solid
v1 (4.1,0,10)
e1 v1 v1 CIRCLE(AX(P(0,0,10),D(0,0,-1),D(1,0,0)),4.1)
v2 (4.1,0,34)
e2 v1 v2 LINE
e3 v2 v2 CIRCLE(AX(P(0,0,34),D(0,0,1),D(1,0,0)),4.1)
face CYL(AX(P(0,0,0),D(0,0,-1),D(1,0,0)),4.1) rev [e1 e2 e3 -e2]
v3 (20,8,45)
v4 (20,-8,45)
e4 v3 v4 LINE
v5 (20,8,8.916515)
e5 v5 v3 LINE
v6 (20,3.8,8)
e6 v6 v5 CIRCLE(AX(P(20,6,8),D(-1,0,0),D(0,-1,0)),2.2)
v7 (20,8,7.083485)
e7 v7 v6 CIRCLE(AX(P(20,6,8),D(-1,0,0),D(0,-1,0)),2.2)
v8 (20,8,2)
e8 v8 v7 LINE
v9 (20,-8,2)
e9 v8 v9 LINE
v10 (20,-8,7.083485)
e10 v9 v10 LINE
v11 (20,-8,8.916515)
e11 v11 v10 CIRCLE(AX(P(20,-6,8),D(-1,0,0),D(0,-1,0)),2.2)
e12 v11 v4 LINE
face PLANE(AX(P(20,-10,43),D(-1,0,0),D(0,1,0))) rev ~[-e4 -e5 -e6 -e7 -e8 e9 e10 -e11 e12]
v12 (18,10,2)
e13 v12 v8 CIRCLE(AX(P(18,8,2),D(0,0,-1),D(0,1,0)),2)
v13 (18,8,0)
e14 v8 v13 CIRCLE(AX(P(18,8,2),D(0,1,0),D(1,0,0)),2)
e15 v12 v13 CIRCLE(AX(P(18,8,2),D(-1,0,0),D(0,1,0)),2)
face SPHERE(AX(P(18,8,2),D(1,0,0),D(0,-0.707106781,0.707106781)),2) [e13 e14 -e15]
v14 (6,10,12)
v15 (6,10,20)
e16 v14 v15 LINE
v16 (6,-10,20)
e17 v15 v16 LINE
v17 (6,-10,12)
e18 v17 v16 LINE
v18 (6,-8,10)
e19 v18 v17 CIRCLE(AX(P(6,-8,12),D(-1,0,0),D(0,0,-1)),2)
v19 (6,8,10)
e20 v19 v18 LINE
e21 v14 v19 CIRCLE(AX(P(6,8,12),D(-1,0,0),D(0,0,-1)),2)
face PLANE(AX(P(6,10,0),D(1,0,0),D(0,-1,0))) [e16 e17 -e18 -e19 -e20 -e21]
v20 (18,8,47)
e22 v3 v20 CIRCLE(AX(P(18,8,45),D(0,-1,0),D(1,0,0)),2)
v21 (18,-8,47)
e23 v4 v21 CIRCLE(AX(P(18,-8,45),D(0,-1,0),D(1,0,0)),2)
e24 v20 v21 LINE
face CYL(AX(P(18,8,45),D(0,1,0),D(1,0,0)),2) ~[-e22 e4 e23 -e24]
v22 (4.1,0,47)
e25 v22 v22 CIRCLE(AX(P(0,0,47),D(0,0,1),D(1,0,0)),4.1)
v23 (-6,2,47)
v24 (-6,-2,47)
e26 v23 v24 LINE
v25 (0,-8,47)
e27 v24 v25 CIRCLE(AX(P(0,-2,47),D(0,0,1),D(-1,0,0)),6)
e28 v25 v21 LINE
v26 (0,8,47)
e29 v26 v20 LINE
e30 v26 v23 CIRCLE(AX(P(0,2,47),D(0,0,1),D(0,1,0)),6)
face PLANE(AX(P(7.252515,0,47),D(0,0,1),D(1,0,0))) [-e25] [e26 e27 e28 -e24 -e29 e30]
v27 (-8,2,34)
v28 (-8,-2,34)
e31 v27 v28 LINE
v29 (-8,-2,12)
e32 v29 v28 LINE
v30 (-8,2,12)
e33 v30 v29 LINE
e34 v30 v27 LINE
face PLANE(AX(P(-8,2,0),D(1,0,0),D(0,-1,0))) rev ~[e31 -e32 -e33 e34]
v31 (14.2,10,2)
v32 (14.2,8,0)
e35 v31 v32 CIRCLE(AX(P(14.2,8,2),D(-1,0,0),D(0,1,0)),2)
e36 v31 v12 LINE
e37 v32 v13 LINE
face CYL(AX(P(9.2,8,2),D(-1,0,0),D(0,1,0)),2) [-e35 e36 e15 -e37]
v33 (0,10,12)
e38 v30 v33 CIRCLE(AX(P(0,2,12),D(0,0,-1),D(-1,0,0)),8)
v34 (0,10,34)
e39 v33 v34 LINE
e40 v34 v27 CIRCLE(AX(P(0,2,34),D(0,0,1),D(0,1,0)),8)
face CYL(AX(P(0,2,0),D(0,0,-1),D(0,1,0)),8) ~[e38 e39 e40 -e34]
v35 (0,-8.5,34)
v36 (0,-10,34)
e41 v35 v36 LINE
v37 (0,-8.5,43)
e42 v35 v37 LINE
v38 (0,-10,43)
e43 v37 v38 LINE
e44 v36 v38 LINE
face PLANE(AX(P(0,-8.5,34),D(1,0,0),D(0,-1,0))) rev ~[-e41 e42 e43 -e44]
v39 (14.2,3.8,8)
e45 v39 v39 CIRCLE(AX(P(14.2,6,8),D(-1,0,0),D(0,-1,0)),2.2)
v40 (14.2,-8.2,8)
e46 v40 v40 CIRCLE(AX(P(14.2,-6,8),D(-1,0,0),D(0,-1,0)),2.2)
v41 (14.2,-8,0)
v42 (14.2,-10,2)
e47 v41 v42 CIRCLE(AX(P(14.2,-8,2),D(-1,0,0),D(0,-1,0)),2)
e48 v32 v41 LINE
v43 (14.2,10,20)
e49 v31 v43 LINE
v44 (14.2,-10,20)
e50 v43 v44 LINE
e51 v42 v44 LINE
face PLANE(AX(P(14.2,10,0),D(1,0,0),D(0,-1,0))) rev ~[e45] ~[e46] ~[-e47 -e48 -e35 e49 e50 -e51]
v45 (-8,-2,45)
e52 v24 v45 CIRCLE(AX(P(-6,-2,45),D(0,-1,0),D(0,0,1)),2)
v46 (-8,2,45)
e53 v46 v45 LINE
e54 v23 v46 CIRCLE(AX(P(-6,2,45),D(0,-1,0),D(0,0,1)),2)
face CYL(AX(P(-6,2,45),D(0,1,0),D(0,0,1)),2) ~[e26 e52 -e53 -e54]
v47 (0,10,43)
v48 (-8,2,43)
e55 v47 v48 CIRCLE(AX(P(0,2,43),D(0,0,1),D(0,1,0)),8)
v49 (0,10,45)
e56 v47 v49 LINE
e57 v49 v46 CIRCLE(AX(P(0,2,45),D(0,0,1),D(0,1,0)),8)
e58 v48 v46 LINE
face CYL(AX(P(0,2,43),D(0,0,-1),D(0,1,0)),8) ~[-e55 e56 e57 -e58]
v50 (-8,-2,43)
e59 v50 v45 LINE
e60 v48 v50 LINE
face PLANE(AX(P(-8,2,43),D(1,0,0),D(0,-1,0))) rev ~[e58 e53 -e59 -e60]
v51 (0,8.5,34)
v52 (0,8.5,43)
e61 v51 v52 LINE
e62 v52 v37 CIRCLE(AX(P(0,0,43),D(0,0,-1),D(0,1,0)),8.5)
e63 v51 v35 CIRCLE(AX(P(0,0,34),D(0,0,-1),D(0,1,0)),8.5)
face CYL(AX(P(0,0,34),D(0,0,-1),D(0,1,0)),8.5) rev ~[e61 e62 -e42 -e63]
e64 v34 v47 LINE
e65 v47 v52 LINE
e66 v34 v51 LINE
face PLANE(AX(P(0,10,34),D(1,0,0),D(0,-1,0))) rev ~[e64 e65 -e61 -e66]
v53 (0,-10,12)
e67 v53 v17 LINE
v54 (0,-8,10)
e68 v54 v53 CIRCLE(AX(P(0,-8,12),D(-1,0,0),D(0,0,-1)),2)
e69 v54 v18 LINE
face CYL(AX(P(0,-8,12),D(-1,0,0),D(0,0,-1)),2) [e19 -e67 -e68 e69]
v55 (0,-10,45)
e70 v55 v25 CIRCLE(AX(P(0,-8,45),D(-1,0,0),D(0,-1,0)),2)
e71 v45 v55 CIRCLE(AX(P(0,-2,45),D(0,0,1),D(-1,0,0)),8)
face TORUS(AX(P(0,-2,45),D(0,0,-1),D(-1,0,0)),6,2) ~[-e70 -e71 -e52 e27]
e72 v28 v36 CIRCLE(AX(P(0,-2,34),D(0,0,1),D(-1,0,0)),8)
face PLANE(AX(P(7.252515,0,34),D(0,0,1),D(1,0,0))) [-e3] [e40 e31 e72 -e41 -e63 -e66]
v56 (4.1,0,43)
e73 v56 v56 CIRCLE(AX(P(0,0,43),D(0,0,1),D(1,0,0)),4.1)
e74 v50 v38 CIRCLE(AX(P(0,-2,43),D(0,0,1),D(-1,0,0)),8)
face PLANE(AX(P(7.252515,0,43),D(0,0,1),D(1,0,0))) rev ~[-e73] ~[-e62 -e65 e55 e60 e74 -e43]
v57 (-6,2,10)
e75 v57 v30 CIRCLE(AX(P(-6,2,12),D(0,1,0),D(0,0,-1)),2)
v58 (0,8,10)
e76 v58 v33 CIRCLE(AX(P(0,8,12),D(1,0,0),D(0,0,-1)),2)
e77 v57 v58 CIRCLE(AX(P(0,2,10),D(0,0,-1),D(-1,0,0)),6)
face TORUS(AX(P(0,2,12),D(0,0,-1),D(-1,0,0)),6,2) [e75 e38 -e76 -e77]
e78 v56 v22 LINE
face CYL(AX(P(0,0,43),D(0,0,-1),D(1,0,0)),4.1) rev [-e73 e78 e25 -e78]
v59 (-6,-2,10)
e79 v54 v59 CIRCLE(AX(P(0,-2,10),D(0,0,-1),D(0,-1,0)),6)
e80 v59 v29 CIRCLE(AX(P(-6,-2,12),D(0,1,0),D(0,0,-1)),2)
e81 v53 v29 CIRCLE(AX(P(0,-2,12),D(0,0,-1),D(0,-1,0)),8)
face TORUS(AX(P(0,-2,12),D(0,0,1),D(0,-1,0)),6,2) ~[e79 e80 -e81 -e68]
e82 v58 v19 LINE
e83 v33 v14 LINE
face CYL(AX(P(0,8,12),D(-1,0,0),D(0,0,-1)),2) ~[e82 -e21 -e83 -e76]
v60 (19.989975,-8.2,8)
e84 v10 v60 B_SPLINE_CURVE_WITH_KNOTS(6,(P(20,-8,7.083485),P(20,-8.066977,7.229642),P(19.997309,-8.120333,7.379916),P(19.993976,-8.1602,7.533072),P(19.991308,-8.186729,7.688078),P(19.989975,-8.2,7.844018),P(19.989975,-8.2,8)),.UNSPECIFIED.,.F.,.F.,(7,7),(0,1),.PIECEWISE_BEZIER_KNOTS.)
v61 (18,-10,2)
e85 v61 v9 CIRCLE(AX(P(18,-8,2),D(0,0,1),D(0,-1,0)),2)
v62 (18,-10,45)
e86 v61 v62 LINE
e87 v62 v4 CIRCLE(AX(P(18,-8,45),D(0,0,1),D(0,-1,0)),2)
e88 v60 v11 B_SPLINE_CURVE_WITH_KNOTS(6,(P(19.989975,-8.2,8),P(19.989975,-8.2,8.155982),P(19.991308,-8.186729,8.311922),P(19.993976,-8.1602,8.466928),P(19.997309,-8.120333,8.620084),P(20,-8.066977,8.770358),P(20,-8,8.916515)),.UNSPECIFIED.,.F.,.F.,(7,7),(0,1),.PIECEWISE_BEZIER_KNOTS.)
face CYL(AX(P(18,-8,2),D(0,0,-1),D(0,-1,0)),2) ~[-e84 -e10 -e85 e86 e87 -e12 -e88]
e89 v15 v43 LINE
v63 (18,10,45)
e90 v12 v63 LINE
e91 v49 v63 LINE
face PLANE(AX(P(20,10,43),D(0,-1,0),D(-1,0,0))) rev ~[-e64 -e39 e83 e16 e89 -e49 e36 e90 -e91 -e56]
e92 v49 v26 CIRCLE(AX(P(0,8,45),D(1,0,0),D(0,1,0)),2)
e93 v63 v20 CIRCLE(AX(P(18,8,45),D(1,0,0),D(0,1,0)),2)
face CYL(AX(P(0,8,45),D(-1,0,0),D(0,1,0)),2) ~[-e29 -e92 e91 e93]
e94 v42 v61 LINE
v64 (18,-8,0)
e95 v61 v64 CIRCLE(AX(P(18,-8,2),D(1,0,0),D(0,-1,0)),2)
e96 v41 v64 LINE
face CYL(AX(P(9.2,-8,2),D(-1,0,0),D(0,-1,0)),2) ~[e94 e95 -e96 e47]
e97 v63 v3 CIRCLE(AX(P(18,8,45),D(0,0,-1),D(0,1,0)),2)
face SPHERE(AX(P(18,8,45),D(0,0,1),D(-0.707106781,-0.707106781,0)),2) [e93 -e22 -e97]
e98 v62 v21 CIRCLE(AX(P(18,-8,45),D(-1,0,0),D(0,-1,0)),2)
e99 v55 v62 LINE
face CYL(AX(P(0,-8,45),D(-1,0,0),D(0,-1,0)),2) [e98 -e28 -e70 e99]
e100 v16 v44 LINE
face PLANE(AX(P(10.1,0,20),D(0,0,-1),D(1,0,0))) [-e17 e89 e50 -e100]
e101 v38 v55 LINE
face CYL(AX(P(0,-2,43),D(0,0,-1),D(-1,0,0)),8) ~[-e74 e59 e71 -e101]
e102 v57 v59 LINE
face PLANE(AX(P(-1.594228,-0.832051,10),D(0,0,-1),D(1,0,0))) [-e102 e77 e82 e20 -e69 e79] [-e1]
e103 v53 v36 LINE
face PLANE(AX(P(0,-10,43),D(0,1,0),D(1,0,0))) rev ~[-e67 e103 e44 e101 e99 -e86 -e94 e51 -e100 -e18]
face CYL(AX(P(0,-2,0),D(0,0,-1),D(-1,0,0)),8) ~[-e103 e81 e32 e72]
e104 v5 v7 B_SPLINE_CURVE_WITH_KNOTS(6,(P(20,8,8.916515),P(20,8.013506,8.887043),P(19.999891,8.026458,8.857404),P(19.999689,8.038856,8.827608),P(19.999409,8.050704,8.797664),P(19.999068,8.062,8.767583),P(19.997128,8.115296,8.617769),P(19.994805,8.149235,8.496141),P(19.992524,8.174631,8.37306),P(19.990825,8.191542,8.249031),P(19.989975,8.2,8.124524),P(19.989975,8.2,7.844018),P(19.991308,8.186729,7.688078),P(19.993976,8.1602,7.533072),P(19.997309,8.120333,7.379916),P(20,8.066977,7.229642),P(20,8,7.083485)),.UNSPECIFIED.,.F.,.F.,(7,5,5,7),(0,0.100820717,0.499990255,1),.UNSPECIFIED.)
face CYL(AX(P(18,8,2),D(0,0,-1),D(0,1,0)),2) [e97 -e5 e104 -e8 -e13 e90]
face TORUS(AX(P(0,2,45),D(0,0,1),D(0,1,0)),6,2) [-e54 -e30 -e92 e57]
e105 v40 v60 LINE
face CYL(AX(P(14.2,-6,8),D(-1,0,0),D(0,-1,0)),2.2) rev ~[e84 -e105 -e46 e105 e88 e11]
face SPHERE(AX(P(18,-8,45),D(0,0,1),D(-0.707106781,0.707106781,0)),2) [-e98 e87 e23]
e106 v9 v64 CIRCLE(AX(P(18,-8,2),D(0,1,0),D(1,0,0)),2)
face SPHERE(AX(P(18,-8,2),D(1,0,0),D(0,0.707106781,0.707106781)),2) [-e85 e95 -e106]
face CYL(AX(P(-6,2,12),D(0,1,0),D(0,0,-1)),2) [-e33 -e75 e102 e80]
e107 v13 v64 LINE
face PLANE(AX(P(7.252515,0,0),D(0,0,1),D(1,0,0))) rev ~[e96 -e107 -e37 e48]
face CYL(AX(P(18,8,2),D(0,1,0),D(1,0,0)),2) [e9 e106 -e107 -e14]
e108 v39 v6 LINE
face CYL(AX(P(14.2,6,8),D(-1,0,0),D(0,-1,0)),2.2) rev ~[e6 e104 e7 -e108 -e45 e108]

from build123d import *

# Parameters (mm, degrees)
F0_R          = 4.1
F1_DEPTH      = 34
F3_DEPTH      = 9
F4_R          = 4.1
F5_DEPTH      = 4
F6_W          = 8.2
F6_H          = 20
F7_DEPTH      = 20
F8_W          = 15.1884564608
F8_H          = 21.6641027853
F9_DEPTH      = 10
F10_R         = 2.2
F11_DEPTH     = 25
F12_T1_DEPTH  = 8.8
F12_T3_DEPTH  = 18
F12_T5_DEPTH  = 16
F12_T7_DEPTH  = 43
F12_T9_DEPTH  = 4
F12_T11_DEPTH = 11
F12_S15_W     = 2
F12_S15_H     = 2
F12_T16_DEPTH = 2
F12_S21_W     = 2
F12_S21_H     = 2
F12_T22_DEPTH = 2
F12_S27_W     = 2
F12_S27_H     = 2
F12_T28_DEPTH = 2
F12_S33_W     = 2
F12_S33_H     = 2
F12_T34_DEPTH = 2
F12_T38_ANGLE = 90
F12_T40_ANGLE = 90
F12_T42_ANGLE = 90
F12_T44_ANGLE = 90


# Not quite as in the source:
# - a fillet or chamfer that OpenCascade refuses, or shapes differently, is made with other operations: its cross-section is extruded or revolved along the edge and cut away or added


with BuildPart() as f1:
    # F0 (on Top) → F1 (new body)
    with BuildSketch(Plane.XY):
        with BuildLine():
            ThreePointArc((-8, -2), (-5.6568542495, -7.6568542495), (0, -10))
            Line((0, -10), (20, -10))
            Line((20, -10), (20, 10))
            Line((20, 10), (0, 10))
            ThreePointArc((0, 10), (-5.6568542495, 7.6568542495), (-8, 2))
            Line((-8, 2), (-8, -2))
        make_face()
        Circle(F0_R, mode=Mode.SUBTRACT)
    extrude(amount=F1_DEPTH)

    # F2 (on face) → F3 (join)
    with BuildSketch(Plane.XY.offset(34)):
        with BuildLine():
            Line((0, 10), (0, 8.5))
            ThreePointArc((0, 8.5), (8.5, 0), (0, -8.5))
            Line((0, -8.5), (0, -10))
            Line((0, -10), (20, -10))
            Line((20, -10), (20, 10))
            Line((20, 10), (0, 10))
        make_face()
    extrude(amount=F3_DEPTH)

    # F4 (on face) → F5 (join)
    with BuildSketch(Plane.XY.offset(43)):
        with BuildLine():
            Line((20, -10), (20, 10))
            Line((20, 10), (0, 10))
            ThreePointArc((0, 10), (-5.6568542495, 7.6568542495), (-8, 2))
            Line((-8, 2), (-8, -2))
            ThreePointArc((-8, -2), (-5.6568542495, -7.6568542495), (0, -10))
            Line((0, -10), (20, -10))
        make_face()
        Circle(F4_R, mode=Mode.SUBTRACT)
    extrude(amount=F5_DEPTH)

    # F6 (on face) → F7 (cut)
    with BuildSketch(Plane(origin=(0, 0, 0), x_dir=(1, 0, 0), z_dir=(0, 0, -1))):
        with Locations((10.1, 0)):
            Rectangle(F6_W, F6_H)
    extrude(amount=-F7_DEPTH, mode=Mode.SUBTRACT)

    # F8 (on face) → F9 (cut)
    with BuildSketch(Plane(origin=(0, 0, 0), x_dir=(1, 0, 0), z_dir=(0, 0, -1))):
        with Locations((-1.5942282304, 0.8320513926)):
            Rectangle(F8_W, F8_H)
    extrude(amount=-F9_DEPTH, mode=Mode.SUBTRACT)

    # F10 (on face) → F11 (cut)
    with BuildSketch(Plane(origin=(14.2, 0, 0), x_dir=(0, -1, 0), z_dir=(-1, 0, 0))):
        with Locations((6, 8)):
            Circle(F10_R)
        with Locations((-6, 8)):
            Circle(F10_R)
    extrude(amount=-F11_DEPTH, mode=Mode.SUBTRACT)

    # F12: fillet of radius 2 on 16 edges, made by hand

    # F12_s2 → F12_t1 (cut)
    with BuildSketch(Plane.YZ.offset(9.2)):
        with BuildLine():
            ThreePointArc((10, 2), (9.4142135624, 0.5857864376), (8, 0))
            Line((8, 0), (10, 0))
            Line((10, 0), (10, 2))
        make_face()
        with BuildLine():
            ThreePointArc((-10, 2), (-9.4142135624, 0.5857864376), (-8, 0))
            Line((-8, 0), (-10, 0))
            Line((-10, 0), (-10, 2))
        make_face()
    extrude(amount=F12_T1_DEPTH, mode=Mode.SUBTRACT)

    # F12_s4 → F12_t3 (cut)
    with BuildSketch(Plane.YZ):
        with BuildLine():
            ThreePointArc((10, 45), (9.4142135624, 46.4142135624), (8, 47))
            Line((8, 47), (10, 47))
            Line((10, 47), (10, 45))
        make_face()
        with BuildLine():
            ThreePointArc((-10, 45), (-9.4142135624, 46.4142135624), (-8, 47))
            Line((-8, 47), (-10, 47))
            Line((-10, 47), (-10, 45))
        make_face()
    extrude(amount=F12_T3_DEPTH, mode=Mode.SUBTRACT)

    # F12_s6 → F12_t5 (cut)
    with BuildSketch(Plane.XZ.offset(-8)):
        with BuildLine():
            ThreePointArc((20, 45), (19.4142135624, 46.4142135624), (18, 47))
            Line((18, 47), (20, 47))
            Line((20, 47), (20, 45))
        make_face()
        with BuildLine():
            ThreePointArc((20, 2), (19.4142135624, 0.5857864376), (18, 0))
            Line((18, 0), (20, 0))
            Line((20, 0), (20, 2))
        make_face()
    extrude(amount=F12_T5_DEPTH, mode=Mode.SUBTRACT)

    # F12_s8 → F12_t7 (cut)
    with BuildSketch(Plane.XY.offset(2)):
        with BuildLine():
            ThreePointArc((18, 10), (19.4142135624, 9.4142135624), (20, 8))
            Line((20, 8), (20, 10))
            Line((20, 10), (18, 10))
        make_face()
        with BuildLine():
            ThreePointArc((18, -10), (19.4142135624, -9.4142135624), (20, -8))
            Line((20, -8), (20, -10))
            Line((20, -10), (18, -10))
        make_face()
    extrude(amount=F12_T7_DEPTH, mode=Mode.SUBTRACT)

    # F12_s10 → F12_t9 (cut)
    with BuildSketch(Plane.XZ.offset(-2)):
        with BuildLine():
            ThreePointArc((-6, 10), (-7.4142135624, 10.5857864376), (-8, 12))
            Line((-8, 12), (-8, 10))
            Line((-8, 10), (-6, 10))
        make_face()
        with BuildLine():
            ThreePointArc((-6, 47), (-7.4142135624, 46.4142135624), (-8, 45))
            Line((-8, 45), (-8, 47))
            Line((-8, 47), (-6, 47))
        make_face()
    extrude(amount=F12_T9_DEPTH, mode=Mode.SUBTRACT)

    # F12_s12 → F12_t11 (cut)
    with BuildSketch(Plane.YZ):
        with BuildLine():
            ThreePointArc((-8, 10), (-9.4142135624, 10.5857864376), (-10, 12))
            Line((-10, 12), (-10, 10))
            Line((-10, 10), (-8, 10))
        make_face()
        with BuildLine():
            ThreePointArc((8, 10), (9.4142135624, 10.5857864376), (10, 12))
            Line((10, 12), (10, 10))
            Line((10, 10), (8, 10))
        make_face()
    extrude(amount=F12_T11_DEPTH, mode=Mode.SUBTRACT)


with BuildPart() as f12_tool14:
    # F12_s15 → F12_t16 (new body)
    with BuildSketch(Plane.YZ.offset(18)):
        with Locations((9, 1)):
            Rectangle(F12_S15_W, F12_S15_H)
    extrude(amount=F12_T16_DEPTH)

    # F12_s17 → F12_t18 (revolve, cut)
    with BuildSketch(Plane(origin=(18, 8, 2), x_dir=(0, -0.7071067812, 0.7071067812), z_dir=(0, 0.7071067812, 0.7071067812))):
        with BuildLine():
            ThreePointArc((0, -2), (2, 0), (0, 2))
            Line((0, 2), (0, -2))
        make_face()
    revolve(axis=Axis((18, 8, 2), (1, 0, 0)), mode=Mode.SUBTRACT)


with BuildPart() as f1_1:
    add(f1.part)

    # F12_t13: cut F12_tool14
    add(f12_tool14.part, mode=Mode.SUBTRACT)


with BuildPart() as f12_tool20:
    # F12_s21 → F12_t22 (new body)
    with BuildSketch(Plane.XY.offset(45)):
        with Locations((19, 9)):
            Rectangle(F12_S21_W, F12_S21_H)
    extrude(amount=F12_T22_DEPTH)

    # F12_s23 → F12_t24 (revolve, cut)
    with BuildSketch(Plane(origin=(18, 8, 45), x_dir=(-0.7071067812, -0.7071067812, 0), z_dir=(-0.7071067812, 0.7071067812, 0))):
        with BuildLine():
            ThreePointArc((0, -2), (2, 0), (0, 2))
            Line((0, 2), (0, -2))
        make_face()
    revolve(axis=Axis((18, 8, 45), (0, 0, 1)), mode=Mode.SUBTRACT)


with BuildPart() as f1_2:
    add(f1_1.part)

    # F12_t19: cut F12_tool20
    add(f12_tool20.part, mode=Mode.SUBTRACT)


with BuildPart() as f12_tool26:
    # F12_s27 → F12_t28 (new body)
    with BuildSketch(Plane.XY.offset(45)):
        with Locations((19, -9)):
            Rectangle(F12_S27_W, F12_S27_H)
    extrude(amount=F12_T28_DEPTH)

    # F12_s29 → F12_t30 (revolve, cut)
    with BuildSketch(Plane(origin=(18, -8, 45), x_dir=(-0.7071067812, 0.7071067812, 0), z_dir=(0.7071067812, 0.7071067812, 0))):
        with BuildLine():
            ThreePointArc((0, -2), (2, 0), (0, 2))
            Line((0, 2), (0, -2))
        make_face()
    revolve(axis=Axis((18, -8, 45), (0, 0, 1)), mode=Mode.SUBTRACT)


with BuildPart() as f1_3:
    add(f1_2.part)

    # F12_t25: cut F12_tool26
    add(f12_tool26.part, mode=Mode.SUBTRACT)


with BuildPart() as f12_tool32:
    # F12_s33 → F12_t34 (new body)
    with BuildSketch(Plane.YZ.offset(18)):
        with Locations((-9, 1)):
            Rectangle(F12_S33_W, F12_S33_H)
    extrude(amount=F12_T34_DEPTH)

    # F12_s35 → F12_t36 (revolve, cut)
    with BuildSketch(Plane(origin=(18, -8, 2), x_dir=(0, 0.7071067812, 0.7071067812), z_dir=(0, 0.7071067812, -0.7071067812))):
        with BuildLine():
            ThreePointArc((0, -2), (2, 0), (0, 2))
            Line((0, 2), (0, -2))
        make_face()
    revolve(axis=Axis((18, -8, 2), (1, 0, 0)), mode=Mode.SUBTRACT)


with BuildPart() as f1_4:
    add(f1_3.part)

    # F12_t31: cut F12_tool32
    add(f12_tool32.part, mode=Mode.SUBTRACT)

    # F12_s37 → F12_t38 (revolve, cut)
    with BuildSketch(Plane.YZ):
        with BuildLine():
            ThreePointArc((-8, 10), (-9.4142135624, 10.5857864376), (-10, 12))
            Line((-10, 12), (-10, 10))
            Line((-10, 10), (-8, 10))
        make_face()
    revolve(axis=Axis((0, -2, 10), (0, 0, -1)), revolution_arc=F12_T38_ANGLE, mode=Mode.SUBTRACT)

    # F12_s39 → F12_t40 (revolve, cut)
    with BuildSketch(Plane.XZ.offset(-2)):
        with BuildLine():
            ThreePointArc((-8, 12), (-7.4142135624, 10.5857864376), (-6, 10))
            Line((-6, 10), (-8, 10))
            Line((-8, 10), (-8, 12))
        make_face()
    revolve(axis=Axis((0, 2, 10), (0, 0, -1)), revolution_arc=F12_T40_ANGLE, mode=Mode.SUBTRACT)

    # F12_s41 → F12_t42 (revolve, cut)
    with BuildSketch(Plane.YZ):
        with BuildLine():
            ThreePointArc((10, 45), (9.4142135624, 46.4142135624), (8, 47))
            Line((8, 47), (10, 47))
            Line((10, 47), (10, 45))
        make_face()
    revolve(axis=Axis((0, 2, 47), (0, 0, 1)), revolution_arc=F12_T42_ANGLE, mode=Mode.SUBTRACT)

    # F12_s43 → F12_t44 (revolve, cut)
    with BuildSketch(Plane.XZ.offset(2)):
        with BuildLine():
            ThreePointArc((-6, 47), (-7.4142135624, 46.4142135624), (-8, 45))
            Line((-8, 45), (-8, 47))
            Line((-8, 47), (-6, 47))
        make_face()
    revolve(axis=Axis((0, -2, 47), (0, 0, 1)), revolution_arc=F12_T44_ANGLE, mode=Mode.SUBTRACT)


solid = f1_4.part
